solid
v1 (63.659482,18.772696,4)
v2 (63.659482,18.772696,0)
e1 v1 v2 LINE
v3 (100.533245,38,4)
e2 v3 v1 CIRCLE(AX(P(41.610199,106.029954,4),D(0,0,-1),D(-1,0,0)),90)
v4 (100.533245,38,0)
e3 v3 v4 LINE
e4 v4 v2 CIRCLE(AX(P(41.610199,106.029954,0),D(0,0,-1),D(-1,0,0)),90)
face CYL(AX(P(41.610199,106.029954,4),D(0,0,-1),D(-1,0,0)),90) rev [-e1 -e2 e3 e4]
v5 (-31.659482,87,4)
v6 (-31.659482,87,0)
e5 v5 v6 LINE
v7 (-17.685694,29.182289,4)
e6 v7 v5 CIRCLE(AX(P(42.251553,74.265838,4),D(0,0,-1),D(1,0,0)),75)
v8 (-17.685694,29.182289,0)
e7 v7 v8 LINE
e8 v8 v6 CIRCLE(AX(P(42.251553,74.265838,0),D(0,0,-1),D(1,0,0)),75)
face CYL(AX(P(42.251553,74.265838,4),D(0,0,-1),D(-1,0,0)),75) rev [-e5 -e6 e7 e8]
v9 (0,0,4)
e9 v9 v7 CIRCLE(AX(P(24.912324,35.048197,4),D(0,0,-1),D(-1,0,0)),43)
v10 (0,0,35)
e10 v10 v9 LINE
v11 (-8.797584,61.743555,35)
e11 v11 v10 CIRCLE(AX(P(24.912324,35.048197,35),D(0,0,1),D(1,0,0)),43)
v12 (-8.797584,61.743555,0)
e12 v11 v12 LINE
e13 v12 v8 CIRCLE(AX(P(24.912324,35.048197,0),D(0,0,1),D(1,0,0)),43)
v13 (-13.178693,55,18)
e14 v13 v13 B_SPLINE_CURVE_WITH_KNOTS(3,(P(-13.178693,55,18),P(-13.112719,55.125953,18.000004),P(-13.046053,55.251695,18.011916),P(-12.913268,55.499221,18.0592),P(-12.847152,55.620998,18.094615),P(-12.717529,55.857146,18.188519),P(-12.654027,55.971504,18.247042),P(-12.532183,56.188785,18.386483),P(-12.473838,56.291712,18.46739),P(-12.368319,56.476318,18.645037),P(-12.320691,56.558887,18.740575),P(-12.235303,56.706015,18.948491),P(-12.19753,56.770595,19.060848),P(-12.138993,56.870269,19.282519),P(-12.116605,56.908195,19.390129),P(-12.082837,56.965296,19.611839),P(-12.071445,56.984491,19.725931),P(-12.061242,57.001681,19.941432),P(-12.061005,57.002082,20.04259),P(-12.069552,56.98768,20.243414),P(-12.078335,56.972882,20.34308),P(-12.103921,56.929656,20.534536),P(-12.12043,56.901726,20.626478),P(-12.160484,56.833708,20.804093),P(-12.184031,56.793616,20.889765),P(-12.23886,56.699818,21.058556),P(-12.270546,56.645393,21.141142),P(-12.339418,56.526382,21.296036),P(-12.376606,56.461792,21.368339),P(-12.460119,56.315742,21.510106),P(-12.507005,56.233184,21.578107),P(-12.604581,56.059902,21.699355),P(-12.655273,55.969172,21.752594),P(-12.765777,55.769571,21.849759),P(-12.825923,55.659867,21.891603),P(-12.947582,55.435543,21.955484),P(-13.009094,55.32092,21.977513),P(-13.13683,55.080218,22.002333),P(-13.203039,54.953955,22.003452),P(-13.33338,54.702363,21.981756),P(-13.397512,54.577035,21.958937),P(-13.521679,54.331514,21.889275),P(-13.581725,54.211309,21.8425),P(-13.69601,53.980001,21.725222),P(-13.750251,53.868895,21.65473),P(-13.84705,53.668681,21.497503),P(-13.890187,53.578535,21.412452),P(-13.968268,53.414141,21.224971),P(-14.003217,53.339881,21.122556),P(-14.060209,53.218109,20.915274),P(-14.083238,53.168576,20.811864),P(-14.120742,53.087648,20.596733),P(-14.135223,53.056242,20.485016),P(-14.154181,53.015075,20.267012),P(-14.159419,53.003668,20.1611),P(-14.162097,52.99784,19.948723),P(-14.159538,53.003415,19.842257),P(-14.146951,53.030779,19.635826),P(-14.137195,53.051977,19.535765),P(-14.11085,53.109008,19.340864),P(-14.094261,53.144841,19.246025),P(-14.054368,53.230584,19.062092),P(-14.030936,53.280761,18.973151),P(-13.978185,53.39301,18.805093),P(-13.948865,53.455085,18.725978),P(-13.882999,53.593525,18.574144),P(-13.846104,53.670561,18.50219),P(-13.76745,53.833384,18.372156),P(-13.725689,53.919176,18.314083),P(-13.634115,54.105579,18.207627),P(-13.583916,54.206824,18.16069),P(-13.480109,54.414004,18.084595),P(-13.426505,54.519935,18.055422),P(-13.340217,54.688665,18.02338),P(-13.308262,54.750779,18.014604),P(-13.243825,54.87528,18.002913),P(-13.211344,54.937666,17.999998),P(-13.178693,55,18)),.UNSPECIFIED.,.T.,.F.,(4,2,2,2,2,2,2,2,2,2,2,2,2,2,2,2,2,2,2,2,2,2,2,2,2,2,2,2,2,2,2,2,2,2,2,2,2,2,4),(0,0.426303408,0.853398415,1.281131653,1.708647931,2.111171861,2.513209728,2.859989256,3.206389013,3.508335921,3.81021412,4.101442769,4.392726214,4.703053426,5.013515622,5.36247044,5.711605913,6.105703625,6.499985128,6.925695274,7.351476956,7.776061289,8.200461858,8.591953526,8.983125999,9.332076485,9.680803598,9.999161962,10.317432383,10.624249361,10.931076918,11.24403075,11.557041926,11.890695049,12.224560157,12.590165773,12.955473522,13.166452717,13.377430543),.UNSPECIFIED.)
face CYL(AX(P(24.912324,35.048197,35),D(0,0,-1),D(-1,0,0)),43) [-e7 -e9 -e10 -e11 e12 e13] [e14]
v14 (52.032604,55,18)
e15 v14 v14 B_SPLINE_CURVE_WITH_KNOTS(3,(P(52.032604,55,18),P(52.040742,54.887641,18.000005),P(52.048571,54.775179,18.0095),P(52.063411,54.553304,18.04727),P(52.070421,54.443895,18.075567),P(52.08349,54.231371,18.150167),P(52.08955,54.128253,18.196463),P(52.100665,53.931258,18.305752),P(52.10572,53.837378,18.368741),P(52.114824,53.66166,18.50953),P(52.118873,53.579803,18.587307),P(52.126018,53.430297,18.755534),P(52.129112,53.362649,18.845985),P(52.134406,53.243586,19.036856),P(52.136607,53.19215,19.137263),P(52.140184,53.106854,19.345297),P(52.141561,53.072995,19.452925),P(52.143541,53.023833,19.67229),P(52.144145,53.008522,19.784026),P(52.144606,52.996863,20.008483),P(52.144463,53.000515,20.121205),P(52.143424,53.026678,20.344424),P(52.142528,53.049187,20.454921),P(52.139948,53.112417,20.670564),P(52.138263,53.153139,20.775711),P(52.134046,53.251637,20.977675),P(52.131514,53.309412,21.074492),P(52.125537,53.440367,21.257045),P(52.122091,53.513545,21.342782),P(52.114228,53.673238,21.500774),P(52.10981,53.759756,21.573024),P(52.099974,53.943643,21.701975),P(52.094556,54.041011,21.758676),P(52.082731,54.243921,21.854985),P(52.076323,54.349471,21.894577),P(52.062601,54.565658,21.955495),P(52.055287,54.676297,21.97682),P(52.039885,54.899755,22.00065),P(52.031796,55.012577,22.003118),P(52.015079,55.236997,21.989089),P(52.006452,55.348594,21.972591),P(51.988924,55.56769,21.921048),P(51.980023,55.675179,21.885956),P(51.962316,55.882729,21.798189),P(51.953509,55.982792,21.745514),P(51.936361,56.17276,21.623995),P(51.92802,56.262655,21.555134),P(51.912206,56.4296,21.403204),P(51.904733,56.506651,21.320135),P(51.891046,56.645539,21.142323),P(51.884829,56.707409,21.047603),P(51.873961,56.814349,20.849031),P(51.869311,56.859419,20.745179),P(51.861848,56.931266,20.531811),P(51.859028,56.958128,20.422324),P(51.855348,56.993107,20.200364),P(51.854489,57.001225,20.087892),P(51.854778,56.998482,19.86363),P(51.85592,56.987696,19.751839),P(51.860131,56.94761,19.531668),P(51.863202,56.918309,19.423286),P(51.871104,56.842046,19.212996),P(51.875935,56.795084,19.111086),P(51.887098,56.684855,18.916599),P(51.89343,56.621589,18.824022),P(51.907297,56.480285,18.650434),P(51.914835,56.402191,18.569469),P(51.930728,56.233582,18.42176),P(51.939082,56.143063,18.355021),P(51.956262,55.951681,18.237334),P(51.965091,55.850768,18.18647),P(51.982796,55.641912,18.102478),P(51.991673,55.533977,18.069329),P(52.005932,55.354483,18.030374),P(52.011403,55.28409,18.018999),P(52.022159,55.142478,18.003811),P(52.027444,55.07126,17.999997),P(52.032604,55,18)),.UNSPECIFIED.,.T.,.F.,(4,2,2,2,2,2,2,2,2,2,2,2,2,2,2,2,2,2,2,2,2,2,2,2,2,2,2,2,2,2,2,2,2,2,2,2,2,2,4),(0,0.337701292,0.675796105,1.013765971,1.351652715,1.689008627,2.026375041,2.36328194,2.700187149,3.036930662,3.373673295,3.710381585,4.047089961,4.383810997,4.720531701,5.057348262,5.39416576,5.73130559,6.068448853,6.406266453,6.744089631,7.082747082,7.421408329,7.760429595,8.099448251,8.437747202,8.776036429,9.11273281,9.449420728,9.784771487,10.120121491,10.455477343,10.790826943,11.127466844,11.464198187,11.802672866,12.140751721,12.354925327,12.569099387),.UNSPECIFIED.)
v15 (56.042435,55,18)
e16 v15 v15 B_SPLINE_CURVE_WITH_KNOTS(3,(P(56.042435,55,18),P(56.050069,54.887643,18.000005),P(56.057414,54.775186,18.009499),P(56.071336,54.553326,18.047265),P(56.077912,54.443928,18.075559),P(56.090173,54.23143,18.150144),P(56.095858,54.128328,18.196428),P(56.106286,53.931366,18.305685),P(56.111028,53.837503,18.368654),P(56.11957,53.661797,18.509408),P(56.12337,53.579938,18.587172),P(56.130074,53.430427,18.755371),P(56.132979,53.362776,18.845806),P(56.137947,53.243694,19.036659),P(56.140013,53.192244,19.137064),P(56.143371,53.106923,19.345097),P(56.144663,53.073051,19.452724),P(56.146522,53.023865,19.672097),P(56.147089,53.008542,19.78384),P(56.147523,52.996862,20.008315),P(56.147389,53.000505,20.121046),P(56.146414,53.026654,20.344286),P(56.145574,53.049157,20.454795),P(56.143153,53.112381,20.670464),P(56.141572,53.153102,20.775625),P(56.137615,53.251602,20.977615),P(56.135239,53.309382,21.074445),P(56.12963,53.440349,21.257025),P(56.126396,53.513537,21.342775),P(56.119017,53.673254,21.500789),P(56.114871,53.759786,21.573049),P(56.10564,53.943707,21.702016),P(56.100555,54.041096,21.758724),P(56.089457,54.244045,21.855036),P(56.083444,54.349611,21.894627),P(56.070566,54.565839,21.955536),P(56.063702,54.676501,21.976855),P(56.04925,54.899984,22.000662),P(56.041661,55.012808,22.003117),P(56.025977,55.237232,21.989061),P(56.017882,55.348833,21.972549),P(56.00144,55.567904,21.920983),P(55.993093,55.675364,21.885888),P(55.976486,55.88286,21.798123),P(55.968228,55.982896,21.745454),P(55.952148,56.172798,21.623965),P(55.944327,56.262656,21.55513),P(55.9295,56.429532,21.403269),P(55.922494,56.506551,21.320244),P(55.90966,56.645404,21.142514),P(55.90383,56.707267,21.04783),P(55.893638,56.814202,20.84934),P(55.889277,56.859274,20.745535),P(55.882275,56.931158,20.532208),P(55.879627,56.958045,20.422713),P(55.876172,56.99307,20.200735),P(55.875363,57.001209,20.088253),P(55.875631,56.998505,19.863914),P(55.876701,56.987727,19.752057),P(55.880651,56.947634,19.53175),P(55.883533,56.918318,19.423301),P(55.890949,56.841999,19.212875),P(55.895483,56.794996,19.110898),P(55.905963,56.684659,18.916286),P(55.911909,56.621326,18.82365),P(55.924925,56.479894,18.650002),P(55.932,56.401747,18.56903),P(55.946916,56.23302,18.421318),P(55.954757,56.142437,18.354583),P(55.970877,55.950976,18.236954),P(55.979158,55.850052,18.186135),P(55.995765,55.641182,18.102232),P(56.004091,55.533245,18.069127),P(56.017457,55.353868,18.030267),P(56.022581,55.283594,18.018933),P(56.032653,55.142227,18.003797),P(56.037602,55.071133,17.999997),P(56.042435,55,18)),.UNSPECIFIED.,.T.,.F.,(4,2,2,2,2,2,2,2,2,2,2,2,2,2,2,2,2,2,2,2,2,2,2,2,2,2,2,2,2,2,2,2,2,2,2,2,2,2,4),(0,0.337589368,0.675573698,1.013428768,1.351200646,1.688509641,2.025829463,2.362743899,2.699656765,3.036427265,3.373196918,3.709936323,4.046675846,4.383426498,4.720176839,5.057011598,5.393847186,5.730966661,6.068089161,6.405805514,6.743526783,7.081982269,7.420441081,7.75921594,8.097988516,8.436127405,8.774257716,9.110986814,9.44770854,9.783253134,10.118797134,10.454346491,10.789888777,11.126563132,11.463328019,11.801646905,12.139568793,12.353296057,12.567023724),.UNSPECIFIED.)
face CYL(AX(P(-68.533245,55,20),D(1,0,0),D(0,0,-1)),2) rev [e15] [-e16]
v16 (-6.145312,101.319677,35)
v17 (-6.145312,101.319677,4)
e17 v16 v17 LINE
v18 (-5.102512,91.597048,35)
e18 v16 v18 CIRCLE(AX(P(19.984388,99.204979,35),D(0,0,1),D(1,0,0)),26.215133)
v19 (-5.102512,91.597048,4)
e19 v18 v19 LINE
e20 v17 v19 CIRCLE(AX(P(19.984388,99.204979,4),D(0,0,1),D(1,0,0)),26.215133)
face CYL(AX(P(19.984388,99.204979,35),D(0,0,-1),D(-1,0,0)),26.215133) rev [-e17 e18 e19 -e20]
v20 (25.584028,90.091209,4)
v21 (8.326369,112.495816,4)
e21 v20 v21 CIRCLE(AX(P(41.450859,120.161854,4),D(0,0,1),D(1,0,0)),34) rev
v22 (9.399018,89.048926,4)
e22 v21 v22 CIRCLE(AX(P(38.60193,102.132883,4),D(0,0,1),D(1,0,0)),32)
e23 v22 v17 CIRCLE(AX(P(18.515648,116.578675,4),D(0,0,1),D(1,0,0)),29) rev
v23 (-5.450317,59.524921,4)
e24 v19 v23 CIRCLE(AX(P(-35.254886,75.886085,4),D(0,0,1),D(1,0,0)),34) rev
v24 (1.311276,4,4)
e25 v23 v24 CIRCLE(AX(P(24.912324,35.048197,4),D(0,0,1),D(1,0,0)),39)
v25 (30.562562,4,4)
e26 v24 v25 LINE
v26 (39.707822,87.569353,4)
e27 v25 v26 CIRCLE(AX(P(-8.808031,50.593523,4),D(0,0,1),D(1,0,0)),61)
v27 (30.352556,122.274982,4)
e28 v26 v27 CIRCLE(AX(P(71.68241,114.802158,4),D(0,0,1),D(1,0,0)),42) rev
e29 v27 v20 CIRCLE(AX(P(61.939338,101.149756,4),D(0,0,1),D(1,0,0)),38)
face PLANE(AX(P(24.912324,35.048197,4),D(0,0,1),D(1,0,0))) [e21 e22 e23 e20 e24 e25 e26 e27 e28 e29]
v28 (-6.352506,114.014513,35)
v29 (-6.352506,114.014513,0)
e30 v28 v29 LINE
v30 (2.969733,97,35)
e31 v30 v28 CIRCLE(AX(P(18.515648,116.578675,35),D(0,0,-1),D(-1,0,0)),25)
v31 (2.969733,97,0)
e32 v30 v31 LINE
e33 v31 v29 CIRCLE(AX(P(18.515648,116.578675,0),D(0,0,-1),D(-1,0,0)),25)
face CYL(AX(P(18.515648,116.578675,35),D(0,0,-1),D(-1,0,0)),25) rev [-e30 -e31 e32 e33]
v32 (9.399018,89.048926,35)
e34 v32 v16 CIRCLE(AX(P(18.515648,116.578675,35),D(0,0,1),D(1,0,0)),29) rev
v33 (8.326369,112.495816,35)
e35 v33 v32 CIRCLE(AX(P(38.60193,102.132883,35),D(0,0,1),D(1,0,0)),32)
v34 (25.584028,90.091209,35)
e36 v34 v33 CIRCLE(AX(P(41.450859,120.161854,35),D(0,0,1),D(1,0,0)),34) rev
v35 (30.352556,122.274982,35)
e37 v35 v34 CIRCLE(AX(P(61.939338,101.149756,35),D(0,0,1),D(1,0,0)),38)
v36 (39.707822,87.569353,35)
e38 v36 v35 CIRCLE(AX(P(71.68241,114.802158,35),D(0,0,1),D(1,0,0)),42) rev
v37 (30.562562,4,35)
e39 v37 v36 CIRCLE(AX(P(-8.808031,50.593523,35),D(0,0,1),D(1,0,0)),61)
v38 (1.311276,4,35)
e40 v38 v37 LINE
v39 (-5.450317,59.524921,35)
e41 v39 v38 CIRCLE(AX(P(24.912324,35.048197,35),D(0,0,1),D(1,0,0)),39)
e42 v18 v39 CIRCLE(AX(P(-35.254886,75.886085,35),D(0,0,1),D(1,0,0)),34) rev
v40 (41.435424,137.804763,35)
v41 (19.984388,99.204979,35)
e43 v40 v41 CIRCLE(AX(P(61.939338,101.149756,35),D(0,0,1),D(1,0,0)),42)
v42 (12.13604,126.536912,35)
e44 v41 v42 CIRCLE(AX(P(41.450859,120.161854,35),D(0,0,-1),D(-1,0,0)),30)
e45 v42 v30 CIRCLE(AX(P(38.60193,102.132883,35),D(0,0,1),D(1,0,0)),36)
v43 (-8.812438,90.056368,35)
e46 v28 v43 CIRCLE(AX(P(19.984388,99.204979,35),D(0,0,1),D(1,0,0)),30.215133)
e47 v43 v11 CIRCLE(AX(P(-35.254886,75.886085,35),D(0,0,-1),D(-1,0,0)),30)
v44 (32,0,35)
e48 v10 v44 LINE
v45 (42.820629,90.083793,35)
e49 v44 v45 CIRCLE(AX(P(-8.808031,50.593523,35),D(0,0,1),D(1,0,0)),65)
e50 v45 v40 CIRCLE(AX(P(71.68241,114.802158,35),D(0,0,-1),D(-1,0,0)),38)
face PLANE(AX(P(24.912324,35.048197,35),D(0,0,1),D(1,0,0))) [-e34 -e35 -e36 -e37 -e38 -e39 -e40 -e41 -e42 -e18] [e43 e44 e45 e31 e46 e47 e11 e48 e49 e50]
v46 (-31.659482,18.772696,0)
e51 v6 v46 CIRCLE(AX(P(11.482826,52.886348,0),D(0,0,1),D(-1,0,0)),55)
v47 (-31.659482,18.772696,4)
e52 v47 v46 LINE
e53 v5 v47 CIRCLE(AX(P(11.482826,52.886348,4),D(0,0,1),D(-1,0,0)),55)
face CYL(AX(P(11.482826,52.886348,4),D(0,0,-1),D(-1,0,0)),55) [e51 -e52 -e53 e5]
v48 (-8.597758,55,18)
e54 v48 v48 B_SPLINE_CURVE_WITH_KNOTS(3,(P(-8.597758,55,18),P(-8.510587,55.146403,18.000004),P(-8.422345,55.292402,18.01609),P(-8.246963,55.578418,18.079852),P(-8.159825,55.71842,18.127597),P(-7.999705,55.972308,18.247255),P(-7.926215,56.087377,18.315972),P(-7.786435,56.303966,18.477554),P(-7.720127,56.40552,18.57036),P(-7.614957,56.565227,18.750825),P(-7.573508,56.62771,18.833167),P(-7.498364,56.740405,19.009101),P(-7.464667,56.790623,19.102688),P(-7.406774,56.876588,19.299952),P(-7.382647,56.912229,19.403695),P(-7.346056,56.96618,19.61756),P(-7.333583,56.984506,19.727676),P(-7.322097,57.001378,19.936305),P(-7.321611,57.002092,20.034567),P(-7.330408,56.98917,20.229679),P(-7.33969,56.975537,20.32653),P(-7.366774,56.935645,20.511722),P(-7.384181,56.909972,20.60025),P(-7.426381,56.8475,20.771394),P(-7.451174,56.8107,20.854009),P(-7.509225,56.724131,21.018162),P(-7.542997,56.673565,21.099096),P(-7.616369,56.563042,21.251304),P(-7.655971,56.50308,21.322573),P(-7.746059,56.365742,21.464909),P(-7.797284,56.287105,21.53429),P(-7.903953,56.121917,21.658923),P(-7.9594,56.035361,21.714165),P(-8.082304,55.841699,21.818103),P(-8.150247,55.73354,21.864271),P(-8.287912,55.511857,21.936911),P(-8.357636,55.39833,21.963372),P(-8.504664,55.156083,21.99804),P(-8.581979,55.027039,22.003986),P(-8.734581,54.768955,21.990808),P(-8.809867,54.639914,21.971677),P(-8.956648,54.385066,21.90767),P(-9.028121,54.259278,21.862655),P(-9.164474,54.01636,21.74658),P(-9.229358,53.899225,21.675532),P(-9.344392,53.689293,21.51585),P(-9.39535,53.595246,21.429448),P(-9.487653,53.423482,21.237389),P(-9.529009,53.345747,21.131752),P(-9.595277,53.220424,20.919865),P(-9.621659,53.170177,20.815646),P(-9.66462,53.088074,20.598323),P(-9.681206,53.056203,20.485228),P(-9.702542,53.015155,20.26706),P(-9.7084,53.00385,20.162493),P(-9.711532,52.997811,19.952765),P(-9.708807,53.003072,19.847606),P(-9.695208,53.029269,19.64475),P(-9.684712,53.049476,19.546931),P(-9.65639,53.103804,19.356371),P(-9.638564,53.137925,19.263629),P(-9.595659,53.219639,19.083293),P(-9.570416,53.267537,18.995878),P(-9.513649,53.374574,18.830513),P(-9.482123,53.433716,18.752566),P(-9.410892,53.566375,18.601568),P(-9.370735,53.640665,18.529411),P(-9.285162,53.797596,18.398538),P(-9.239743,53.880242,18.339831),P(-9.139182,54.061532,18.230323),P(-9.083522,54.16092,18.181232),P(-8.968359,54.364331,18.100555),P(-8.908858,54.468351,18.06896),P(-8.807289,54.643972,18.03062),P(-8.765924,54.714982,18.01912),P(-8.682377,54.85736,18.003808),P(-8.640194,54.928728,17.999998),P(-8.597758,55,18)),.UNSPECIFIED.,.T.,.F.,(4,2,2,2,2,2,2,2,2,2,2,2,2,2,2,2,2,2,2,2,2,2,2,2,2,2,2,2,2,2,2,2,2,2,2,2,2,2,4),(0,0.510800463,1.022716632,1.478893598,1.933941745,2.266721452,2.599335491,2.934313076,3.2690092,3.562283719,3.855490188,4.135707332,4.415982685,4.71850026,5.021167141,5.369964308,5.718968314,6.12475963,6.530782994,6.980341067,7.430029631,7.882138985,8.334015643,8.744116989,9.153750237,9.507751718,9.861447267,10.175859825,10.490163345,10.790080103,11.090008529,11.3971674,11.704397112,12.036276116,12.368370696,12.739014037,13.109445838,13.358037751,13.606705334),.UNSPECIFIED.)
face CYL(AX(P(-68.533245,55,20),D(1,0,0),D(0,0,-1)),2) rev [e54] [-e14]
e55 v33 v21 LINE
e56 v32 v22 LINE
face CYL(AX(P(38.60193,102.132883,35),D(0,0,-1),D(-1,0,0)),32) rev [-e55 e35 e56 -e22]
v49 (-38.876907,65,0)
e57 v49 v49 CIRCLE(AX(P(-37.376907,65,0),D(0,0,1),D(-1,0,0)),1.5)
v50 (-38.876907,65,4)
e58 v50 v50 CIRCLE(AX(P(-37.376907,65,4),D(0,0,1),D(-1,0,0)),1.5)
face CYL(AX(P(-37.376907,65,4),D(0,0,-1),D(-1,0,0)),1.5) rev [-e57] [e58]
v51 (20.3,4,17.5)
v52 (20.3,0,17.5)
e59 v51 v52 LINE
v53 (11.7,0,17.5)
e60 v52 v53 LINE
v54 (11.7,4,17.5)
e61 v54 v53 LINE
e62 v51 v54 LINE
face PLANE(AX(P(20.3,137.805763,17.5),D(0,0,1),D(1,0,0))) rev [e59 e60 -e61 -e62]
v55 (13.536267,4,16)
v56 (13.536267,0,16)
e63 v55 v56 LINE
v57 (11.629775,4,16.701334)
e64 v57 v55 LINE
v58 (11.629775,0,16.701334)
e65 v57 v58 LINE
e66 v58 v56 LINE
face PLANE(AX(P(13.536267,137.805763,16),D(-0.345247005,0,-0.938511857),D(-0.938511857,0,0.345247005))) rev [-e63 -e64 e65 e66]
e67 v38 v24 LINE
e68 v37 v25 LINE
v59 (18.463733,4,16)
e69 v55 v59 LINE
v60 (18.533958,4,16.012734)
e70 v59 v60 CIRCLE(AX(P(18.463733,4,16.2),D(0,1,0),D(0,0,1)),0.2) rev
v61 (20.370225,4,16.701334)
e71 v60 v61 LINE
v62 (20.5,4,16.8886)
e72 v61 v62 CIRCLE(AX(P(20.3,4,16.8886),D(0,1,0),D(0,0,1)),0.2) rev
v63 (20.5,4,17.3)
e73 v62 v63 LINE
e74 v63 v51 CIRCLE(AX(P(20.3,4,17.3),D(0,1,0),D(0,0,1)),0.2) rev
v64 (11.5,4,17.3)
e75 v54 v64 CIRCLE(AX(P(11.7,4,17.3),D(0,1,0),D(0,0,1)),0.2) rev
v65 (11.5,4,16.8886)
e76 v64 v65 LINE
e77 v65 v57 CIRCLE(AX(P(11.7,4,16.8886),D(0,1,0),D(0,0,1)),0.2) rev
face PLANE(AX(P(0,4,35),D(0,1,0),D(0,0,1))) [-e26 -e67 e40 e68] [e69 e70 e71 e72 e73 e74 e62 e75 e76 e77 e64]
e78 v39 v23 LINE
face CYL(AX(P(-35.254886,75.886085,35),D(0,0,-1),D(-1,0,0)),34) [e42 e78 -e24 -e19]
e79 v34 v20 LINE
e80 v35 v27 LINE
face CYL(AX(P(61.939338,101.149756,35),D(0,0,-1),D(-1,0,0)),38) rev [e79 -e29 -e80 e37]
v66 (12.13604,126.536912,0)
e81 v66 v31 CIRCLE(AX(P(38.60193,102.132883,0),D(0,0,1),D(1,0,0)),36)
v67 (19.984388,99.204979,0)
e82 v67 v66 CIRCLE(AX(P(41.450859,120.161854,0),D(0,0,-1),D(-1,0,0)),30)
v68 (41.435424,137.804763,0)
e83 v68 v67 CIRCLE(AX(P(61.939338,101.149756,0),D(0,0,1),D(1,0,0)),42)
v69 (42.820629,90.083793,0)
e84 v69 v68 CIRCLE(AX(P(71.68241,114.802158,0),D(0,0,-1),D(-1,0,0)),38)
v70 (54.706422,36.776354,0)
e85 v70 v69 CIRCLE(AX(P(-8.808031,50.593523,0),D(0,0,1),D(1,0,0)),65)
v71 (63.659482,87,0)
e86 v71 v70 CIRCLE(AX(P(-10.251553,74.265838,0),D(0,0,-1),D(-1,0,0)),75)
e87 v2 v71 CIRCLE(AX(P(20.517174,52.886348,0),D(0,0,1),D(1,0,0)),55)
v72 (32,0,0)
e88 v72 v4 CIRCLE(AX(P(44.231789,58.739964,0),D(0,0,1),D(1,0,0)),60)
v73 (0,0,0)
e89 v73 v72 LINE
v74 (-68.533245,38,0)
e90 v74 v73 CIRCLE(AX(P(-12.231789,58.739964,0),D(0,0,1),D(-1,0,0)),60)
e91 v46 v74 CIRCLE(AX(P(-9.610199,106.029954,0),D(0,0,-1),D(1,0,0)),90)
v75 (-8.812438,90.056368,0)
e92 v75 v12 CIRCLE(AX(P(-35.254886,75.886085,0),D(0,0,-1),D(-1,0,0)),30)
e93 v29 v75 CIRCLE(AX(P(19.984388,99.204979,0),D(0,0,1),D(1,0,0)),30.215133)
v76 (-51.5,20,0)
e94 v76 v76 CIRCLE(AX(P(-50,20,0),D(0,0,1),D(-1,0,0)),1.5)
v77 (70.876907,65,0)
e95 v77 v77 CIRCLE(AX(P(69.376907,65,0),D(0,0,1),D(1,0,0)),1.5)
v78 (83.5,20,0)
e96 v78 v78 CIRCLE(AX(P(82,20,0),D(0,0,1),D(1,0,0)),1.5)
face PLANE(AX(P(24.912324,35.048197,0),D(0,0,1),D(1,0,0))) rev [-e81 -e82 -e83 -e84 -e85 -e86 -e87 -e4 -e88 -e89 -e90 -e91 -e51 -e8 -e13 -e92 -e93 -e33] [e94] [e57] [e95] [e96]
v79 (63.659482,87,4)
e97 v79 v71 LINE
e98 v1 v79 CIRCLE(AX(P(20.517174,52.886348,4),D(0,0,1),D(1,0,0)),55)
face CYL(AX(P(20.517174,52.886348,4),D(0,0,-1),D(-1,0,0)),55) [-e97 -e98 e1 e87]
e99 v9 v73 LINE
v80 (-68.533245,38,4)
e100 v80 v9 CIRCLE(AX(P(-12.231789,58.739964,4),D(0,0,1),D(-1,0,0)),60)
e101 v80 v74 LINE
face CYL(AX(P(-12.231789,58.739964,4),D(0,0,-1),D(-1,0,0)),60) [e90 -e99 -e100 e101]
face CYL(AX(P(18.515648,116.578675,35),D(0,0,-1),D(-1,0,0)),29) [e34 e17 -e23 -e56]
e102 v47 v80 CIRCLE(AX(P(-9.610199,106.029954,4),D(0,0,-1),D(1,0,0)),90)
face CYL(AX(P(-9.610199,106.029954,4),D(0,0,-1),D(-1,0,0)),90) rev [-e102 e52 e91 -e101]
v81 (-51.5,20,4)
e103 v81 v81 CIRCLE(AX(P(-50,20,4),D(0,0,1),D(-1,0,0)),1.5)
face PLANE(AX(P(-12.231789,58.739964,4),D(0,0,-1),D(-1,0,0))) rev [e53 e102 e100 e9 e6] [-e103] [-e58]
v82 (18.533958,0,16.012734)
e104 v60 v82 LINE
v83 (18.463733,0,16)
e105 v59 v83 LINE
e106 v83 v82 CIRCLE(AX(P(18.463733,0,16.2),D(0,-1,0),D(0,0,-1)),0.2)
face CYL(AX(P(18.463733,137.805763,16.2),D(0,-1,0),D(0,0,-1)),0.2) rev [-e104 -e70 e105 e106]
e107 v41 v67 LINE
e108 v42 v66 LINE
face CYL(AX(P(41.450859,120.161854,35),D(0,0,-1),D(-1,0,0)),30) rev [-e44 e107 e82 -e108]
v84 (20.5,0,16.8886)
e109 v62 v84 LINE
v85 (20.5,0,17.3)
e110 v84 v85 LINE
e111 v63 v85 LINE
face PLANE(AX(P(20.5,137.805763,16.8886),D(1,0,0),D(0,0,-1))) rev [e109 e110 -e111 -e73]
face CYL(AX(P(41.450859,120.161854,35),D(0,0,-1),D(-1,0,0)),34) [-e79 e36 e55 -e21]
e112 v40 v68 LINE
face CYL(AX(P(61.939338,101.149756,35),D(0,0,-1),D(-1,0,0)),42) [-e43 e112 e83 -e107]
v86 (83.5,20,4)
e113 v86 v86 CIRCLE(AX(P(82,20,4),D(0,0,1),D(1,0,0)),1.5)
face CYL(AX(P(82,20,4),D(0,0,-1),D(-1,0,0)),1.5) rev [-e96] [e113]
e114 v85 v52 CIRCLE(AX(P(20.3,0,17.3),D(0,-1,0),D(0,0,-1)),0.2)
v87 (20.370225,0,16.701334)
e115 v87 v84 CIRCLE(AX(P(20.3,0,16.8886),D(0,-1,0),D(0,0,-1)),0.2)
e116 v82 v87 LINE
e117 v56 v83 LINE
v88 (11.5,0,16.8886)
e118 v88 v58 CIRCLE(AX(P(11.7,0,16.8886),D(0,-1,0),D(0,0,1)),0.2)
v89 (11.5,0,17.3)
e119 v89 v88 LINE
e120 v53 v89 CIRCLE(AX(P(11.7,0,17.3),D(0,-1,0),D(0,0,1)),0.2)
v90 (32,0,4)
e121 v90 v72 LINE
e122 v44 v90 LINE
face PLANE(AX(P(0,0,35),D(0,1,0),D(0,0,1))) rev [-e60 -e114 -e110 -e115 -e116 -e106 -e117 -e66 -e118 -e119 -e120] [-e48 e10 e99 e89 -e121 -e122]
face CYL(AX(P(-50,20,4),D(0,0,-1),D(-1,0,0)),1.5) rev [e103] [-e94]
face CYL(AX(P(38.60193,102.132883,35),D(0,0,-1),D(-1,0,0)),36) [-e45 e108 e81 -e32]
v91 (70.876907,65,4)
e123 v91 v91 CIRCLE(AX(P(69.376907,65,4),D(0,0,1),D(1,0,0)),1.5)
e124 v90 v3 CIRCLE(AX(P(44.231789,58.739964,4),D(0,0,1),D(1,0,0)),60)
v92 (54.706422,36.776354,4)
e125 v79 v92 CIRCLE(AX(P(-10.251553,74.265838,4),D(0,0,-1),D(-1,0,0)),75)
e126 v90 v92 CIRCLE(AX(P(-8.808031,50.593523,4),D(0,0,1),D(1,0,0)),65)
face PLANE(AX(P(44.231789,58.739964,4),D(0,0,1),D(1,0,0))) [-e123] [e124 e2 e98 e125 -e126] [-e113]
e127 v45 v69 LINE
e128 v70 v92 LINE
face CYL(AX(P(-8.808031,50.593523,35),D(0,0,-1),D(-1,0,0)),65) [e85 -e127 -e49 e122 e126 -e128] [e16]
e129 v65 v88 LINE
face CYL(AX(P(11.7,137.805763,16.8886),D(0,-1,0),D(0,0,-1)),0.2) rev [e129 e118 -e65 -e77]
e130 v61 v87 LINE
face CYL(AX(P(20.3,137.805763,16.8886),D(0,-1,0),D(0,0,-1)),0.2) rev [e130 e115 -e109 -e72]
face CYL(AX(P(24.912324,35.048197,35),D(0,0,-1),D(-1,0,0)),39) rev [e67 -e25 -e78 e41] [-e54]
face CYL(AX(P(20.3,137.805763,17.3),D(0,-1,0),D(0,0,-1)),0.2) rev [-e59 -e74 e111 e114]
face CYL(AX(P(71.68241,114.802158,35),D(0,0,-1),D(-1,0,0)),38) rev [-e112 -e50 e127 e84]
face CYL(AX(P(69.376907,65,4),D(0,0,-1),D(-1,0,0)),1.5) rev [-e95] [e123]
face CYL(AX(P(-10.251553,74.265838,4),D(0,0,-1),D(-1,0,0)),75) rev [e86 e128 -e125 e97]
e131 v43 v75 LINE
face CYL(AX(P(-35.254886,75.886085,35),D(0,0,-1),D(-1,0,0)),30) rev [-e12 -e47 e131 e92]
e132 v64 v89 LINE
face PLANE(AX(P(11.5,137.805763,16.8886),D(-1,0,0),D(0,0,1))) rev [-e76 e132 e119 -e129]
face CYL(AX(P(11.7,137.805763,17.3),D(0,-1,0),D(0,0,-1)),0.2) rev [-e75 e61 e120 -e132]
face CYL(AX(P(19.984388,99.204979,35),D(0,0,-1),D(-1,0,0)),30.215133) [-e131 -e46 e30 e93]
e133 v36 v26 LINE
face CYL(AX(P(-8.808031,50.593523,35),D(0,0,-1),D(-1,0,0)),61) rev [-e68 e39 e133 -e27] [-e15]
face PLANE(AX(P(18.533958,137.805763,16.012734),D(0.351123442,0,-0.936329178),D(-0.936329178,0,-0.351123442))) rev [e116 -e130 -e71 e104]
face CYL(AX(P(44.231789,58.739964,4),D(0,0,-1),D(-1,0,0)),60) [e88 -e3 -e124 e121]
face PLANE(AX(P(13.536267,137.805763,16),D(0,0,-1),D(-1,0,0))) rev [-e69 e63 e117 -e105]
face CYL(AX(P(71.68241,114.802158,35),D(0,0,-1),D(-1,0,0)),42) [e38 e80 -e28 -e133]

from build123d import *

# Parameters (mm, degrees)
BOSS_EXTRU_1_DEPTH           = 35
COQUE1_START                 = 4
COQUE1_DEPTH                 = 31
ESQUISSE2_R                  = 1.5
BOSS_EXTRU_2_DEPTH           = 4
ENL_V_MAT_EXTRU_1_DEPTH      = 175.132380731
ENL_V_MAT_EXTRU_1_DEPTH_BACK = 175.132380731
ESQUISSE3_R                  = 2
ENL_V_MAT_EXTRU_3_REACH      = 176.132


# Read off the part's stored shape, not the designer's step: Coque1
with BuildPart() as part:
    # Esquisse1 → Boss.-Extru.1 (new body)
    with BuildSketch(Plane.XY):
        with BuildLine():
            Line((0, 0), (32, 0))
            ThreePointArc((32, 0), (55.728066531, 42.841616018), (42.820629182, 90.083792782))
            ThreePointArc((42.820629182, 90.083792782), (33.698409335, 113.699589876), (41.435424367, 137.804762884))
            ThreePointArc((41.435424367, 137.804762884), (25.22744291, 121.551637289), (19.984387859, 99.204979189))
            ThreePointArc((19.984387859, 99.204979189), (12.61609693, 111.881969553), (12.136039681, 126.536912097))
            ThreePointArc((12.136039681, 126.536912097), (4.219515773, 112.802914106), (2.969732835, 97))
            ThreePointArc((2.969732835, 97), (-3.409170119, 104.566084027), (-6.3525056, 114.014512821))
            ThreePointArc((-6.3525056, 114.014512821), (-10.072723061, 102.291129965), (-8.812437557, 90.056367852))
            ThreePointArc((-8.812437557, 90.056367852), (-5.254890234, 75.901823785), (-8.797583956, 61.743554757))
            ThreePointArc((-8.797583956, 61.743554757), (-17.657714331, 28.982568326), (0, 0))
        make_face()
    extrude(amount=BOSS_EXTRU_1_DEPTH)

    # Coque1 outline → Coque1 (cut)
    with BuildSketch(Plane.XY.offset(COQUE1_START)):
        with BuildLine():
            ThreePointArc((-5.450317373, 59.524921192), (-13.80168075, 30.333767047), (1.311276064, 4))
            Line((1.311276064, 4), (30.562561826, 4))
            ThreePointArc((30.562561826, 4), (51.829960407, 43.957714999), (39.70782155, 87.569353124))
            ThreePointArc((39.70782155, 87.569353124), (31.129906971, 103.87080592), (30.352555686, 122.274982261))
            ThreePointArc((30.352555686, 122.274982261), (24.349701453, 106.719246419), (25.584028276, 90.091209439))
            ThreePointArc((25.584028276, 90.091209439), (14.515213943, 99.414058708), (8.326368872, 112.495815697))
            ThreePointArc((8.326368872, 112.495815697), (6.635364168, 100.670475038), (9.39901844, 89.048926361))
            ThreePointArc((9.39901844, 89.048926361), (0.546946732, 93.816298878), (-6.145312397, 101.319676916))
            ThreePointArc((-6.145312397, 101.319676916), (-6.081248931, 96.409310993), (-5.102512487, 91.597048261))
            ThreePointArc((-5.102512487, 91.597048261), (-1.256885168, 75.517395098), (-5.450317373, 59.524921192))
        make_face()
    extrude(amount=COQUE1_DEPTH, mode=Mode.SUBTRACT)

    # Esquisse2 → Boss.-Extru.2 (add)
    # profile 1 of 2: a face of its own
    with BuildSketch(Plane.XY):
        with BuildLine():
            Line((32, 0), (32, 12.299667719))
            ThreePointArc((32, 12.299667719), (58.802567763, 44.999332283), (63.659481669, 87))
            ThreePointArc((63.659481669, 87), (75.517173587, 52.886347991), (63.659481669, 18.772695982))
            ThreePointArc((63.659481669, 18.772695982), (83.222118055, 26.227396664), (100.533244977, 38))
            ThreePointArc((100.533244977, 38), (73.327044482, 6.266483418), (32, 0))
        make_face()
        with Locations((69.376907093, 65)):
            Circle(ESQUISSE2_R, mode=Mode.SUBTRACT)
        with Locations((82, 20)):
            Circle(ESQUISSE2_R, mode=Mode.SUBTRACT)
    # profile 2 of 2: a face of its own
    with BuildSketch(Plane.XY):
        with BuildLine():
            Line((0, 0), (0, 12.299667719))
            ThreePointArc((0, 12.299667719), (-26.802567763, 44.999332283), (-31.659481669, 87))
            ThreePointArc((-31.659481669, 87), (-43.517173587, 52.886347991), (-31.659481669, 18.772695982))
            ThreePointArc((-31.659481669, 18.772695982), (-51.222118055, 26.227396664), (-68.533244977, 38))
            ThreePointArc((-68.533244977, 38), (-41.327044482, 6.266483418), (0, 0))
        make_face()
        with Locations(Location((-50, 20, 0), (0, 0, 180))):
            Circle(ESQUISSE2_R, mode=Mode.SUBTRACT)
        with Locations(Location((-37.376907093, 65, 0), (0, 0, 180))):
            Circle(ESQUISSE2_R, mode=Mode.SUBTRACT)
    extrude(amount=BOSS_EXTRU_2_DEPTH)

    # Esquisse3 → Enlèv. mat.-Extru.1 (cut, two sides: drawn at the far end of the back side and taken through both)
    with BuildSketch(Plane(origin=(0, 0, 0), x_dir=(0, 0, -1), z_dir=(1, 0, 0)).offset(-ENL_V_MAT_EXTRU_1_DEPTH_BACK)):
        with Locations((-20, 55)):
            Circle(ESQUISSE3_R)
    extrude(amount=ENL_V_MAT_EXTRU_1_DEPTH + ENL_V_MAT_EXTRU_1_DEPTH_BACK, mode=Mode.SUBTRACT)

    # Esquisse4 → Enlèv. mat.-Extru.3 (cut, up to next)
    with BuildSketch(Plane.XZ, mode=Mode.PRIVATE) as enl_v_mat_extru_3_sk1:
        with BuildLine():
            Line((13.536266916, 16), (18.463733084, 16))
            ThreePointArc((18.463733084, 16), (18.499418045, 16.00320929), (18.533957772, 16.012734164))
            Line((18.533957772, 16.012734164), (20.370224688, 16.701334258))
            ThreePointArc((20.370224688, 16.701334258), (20.464385124, 16.774681126), (20.5, 16.888600094))
            Line((20.5, 16.888600094), (20.5, 17.3))
            ThreePointArc((20.5, 17.3), (20.441421356, 17.441421356), (20.3, 17.5))
            Line((20.3, 17.5), (11.7, 17.5))
            ThreePointArc((11.7, 17.5), (11.558578644, 17.441421356), (11.5, 17.3))
            Line((11.5, 17.3), (11.5, 16.888600094))
            ThreePointArc((11.5, 16.888600094), (11.535614876, 16.774681126), (11.629775312, 16.701334258))
            Line((11.629775312, 16.701334258), (13.536266916, 16))
        make_face()
    enl_v_mat_extru_3_tool1 = extrude(enl_v_mat_extru_3_sk1.sketch, amount=-ENL_V_MAT_EXTRU_3_REACH, mode=Mode.PRIVATE) & part.part
    add(enl_v_mat_extru_3_tool1.solids().sort_by_distance((16.003291, 0, 16.812223))[0], mode=Mode.SUBTRACT)


solid = part.part
